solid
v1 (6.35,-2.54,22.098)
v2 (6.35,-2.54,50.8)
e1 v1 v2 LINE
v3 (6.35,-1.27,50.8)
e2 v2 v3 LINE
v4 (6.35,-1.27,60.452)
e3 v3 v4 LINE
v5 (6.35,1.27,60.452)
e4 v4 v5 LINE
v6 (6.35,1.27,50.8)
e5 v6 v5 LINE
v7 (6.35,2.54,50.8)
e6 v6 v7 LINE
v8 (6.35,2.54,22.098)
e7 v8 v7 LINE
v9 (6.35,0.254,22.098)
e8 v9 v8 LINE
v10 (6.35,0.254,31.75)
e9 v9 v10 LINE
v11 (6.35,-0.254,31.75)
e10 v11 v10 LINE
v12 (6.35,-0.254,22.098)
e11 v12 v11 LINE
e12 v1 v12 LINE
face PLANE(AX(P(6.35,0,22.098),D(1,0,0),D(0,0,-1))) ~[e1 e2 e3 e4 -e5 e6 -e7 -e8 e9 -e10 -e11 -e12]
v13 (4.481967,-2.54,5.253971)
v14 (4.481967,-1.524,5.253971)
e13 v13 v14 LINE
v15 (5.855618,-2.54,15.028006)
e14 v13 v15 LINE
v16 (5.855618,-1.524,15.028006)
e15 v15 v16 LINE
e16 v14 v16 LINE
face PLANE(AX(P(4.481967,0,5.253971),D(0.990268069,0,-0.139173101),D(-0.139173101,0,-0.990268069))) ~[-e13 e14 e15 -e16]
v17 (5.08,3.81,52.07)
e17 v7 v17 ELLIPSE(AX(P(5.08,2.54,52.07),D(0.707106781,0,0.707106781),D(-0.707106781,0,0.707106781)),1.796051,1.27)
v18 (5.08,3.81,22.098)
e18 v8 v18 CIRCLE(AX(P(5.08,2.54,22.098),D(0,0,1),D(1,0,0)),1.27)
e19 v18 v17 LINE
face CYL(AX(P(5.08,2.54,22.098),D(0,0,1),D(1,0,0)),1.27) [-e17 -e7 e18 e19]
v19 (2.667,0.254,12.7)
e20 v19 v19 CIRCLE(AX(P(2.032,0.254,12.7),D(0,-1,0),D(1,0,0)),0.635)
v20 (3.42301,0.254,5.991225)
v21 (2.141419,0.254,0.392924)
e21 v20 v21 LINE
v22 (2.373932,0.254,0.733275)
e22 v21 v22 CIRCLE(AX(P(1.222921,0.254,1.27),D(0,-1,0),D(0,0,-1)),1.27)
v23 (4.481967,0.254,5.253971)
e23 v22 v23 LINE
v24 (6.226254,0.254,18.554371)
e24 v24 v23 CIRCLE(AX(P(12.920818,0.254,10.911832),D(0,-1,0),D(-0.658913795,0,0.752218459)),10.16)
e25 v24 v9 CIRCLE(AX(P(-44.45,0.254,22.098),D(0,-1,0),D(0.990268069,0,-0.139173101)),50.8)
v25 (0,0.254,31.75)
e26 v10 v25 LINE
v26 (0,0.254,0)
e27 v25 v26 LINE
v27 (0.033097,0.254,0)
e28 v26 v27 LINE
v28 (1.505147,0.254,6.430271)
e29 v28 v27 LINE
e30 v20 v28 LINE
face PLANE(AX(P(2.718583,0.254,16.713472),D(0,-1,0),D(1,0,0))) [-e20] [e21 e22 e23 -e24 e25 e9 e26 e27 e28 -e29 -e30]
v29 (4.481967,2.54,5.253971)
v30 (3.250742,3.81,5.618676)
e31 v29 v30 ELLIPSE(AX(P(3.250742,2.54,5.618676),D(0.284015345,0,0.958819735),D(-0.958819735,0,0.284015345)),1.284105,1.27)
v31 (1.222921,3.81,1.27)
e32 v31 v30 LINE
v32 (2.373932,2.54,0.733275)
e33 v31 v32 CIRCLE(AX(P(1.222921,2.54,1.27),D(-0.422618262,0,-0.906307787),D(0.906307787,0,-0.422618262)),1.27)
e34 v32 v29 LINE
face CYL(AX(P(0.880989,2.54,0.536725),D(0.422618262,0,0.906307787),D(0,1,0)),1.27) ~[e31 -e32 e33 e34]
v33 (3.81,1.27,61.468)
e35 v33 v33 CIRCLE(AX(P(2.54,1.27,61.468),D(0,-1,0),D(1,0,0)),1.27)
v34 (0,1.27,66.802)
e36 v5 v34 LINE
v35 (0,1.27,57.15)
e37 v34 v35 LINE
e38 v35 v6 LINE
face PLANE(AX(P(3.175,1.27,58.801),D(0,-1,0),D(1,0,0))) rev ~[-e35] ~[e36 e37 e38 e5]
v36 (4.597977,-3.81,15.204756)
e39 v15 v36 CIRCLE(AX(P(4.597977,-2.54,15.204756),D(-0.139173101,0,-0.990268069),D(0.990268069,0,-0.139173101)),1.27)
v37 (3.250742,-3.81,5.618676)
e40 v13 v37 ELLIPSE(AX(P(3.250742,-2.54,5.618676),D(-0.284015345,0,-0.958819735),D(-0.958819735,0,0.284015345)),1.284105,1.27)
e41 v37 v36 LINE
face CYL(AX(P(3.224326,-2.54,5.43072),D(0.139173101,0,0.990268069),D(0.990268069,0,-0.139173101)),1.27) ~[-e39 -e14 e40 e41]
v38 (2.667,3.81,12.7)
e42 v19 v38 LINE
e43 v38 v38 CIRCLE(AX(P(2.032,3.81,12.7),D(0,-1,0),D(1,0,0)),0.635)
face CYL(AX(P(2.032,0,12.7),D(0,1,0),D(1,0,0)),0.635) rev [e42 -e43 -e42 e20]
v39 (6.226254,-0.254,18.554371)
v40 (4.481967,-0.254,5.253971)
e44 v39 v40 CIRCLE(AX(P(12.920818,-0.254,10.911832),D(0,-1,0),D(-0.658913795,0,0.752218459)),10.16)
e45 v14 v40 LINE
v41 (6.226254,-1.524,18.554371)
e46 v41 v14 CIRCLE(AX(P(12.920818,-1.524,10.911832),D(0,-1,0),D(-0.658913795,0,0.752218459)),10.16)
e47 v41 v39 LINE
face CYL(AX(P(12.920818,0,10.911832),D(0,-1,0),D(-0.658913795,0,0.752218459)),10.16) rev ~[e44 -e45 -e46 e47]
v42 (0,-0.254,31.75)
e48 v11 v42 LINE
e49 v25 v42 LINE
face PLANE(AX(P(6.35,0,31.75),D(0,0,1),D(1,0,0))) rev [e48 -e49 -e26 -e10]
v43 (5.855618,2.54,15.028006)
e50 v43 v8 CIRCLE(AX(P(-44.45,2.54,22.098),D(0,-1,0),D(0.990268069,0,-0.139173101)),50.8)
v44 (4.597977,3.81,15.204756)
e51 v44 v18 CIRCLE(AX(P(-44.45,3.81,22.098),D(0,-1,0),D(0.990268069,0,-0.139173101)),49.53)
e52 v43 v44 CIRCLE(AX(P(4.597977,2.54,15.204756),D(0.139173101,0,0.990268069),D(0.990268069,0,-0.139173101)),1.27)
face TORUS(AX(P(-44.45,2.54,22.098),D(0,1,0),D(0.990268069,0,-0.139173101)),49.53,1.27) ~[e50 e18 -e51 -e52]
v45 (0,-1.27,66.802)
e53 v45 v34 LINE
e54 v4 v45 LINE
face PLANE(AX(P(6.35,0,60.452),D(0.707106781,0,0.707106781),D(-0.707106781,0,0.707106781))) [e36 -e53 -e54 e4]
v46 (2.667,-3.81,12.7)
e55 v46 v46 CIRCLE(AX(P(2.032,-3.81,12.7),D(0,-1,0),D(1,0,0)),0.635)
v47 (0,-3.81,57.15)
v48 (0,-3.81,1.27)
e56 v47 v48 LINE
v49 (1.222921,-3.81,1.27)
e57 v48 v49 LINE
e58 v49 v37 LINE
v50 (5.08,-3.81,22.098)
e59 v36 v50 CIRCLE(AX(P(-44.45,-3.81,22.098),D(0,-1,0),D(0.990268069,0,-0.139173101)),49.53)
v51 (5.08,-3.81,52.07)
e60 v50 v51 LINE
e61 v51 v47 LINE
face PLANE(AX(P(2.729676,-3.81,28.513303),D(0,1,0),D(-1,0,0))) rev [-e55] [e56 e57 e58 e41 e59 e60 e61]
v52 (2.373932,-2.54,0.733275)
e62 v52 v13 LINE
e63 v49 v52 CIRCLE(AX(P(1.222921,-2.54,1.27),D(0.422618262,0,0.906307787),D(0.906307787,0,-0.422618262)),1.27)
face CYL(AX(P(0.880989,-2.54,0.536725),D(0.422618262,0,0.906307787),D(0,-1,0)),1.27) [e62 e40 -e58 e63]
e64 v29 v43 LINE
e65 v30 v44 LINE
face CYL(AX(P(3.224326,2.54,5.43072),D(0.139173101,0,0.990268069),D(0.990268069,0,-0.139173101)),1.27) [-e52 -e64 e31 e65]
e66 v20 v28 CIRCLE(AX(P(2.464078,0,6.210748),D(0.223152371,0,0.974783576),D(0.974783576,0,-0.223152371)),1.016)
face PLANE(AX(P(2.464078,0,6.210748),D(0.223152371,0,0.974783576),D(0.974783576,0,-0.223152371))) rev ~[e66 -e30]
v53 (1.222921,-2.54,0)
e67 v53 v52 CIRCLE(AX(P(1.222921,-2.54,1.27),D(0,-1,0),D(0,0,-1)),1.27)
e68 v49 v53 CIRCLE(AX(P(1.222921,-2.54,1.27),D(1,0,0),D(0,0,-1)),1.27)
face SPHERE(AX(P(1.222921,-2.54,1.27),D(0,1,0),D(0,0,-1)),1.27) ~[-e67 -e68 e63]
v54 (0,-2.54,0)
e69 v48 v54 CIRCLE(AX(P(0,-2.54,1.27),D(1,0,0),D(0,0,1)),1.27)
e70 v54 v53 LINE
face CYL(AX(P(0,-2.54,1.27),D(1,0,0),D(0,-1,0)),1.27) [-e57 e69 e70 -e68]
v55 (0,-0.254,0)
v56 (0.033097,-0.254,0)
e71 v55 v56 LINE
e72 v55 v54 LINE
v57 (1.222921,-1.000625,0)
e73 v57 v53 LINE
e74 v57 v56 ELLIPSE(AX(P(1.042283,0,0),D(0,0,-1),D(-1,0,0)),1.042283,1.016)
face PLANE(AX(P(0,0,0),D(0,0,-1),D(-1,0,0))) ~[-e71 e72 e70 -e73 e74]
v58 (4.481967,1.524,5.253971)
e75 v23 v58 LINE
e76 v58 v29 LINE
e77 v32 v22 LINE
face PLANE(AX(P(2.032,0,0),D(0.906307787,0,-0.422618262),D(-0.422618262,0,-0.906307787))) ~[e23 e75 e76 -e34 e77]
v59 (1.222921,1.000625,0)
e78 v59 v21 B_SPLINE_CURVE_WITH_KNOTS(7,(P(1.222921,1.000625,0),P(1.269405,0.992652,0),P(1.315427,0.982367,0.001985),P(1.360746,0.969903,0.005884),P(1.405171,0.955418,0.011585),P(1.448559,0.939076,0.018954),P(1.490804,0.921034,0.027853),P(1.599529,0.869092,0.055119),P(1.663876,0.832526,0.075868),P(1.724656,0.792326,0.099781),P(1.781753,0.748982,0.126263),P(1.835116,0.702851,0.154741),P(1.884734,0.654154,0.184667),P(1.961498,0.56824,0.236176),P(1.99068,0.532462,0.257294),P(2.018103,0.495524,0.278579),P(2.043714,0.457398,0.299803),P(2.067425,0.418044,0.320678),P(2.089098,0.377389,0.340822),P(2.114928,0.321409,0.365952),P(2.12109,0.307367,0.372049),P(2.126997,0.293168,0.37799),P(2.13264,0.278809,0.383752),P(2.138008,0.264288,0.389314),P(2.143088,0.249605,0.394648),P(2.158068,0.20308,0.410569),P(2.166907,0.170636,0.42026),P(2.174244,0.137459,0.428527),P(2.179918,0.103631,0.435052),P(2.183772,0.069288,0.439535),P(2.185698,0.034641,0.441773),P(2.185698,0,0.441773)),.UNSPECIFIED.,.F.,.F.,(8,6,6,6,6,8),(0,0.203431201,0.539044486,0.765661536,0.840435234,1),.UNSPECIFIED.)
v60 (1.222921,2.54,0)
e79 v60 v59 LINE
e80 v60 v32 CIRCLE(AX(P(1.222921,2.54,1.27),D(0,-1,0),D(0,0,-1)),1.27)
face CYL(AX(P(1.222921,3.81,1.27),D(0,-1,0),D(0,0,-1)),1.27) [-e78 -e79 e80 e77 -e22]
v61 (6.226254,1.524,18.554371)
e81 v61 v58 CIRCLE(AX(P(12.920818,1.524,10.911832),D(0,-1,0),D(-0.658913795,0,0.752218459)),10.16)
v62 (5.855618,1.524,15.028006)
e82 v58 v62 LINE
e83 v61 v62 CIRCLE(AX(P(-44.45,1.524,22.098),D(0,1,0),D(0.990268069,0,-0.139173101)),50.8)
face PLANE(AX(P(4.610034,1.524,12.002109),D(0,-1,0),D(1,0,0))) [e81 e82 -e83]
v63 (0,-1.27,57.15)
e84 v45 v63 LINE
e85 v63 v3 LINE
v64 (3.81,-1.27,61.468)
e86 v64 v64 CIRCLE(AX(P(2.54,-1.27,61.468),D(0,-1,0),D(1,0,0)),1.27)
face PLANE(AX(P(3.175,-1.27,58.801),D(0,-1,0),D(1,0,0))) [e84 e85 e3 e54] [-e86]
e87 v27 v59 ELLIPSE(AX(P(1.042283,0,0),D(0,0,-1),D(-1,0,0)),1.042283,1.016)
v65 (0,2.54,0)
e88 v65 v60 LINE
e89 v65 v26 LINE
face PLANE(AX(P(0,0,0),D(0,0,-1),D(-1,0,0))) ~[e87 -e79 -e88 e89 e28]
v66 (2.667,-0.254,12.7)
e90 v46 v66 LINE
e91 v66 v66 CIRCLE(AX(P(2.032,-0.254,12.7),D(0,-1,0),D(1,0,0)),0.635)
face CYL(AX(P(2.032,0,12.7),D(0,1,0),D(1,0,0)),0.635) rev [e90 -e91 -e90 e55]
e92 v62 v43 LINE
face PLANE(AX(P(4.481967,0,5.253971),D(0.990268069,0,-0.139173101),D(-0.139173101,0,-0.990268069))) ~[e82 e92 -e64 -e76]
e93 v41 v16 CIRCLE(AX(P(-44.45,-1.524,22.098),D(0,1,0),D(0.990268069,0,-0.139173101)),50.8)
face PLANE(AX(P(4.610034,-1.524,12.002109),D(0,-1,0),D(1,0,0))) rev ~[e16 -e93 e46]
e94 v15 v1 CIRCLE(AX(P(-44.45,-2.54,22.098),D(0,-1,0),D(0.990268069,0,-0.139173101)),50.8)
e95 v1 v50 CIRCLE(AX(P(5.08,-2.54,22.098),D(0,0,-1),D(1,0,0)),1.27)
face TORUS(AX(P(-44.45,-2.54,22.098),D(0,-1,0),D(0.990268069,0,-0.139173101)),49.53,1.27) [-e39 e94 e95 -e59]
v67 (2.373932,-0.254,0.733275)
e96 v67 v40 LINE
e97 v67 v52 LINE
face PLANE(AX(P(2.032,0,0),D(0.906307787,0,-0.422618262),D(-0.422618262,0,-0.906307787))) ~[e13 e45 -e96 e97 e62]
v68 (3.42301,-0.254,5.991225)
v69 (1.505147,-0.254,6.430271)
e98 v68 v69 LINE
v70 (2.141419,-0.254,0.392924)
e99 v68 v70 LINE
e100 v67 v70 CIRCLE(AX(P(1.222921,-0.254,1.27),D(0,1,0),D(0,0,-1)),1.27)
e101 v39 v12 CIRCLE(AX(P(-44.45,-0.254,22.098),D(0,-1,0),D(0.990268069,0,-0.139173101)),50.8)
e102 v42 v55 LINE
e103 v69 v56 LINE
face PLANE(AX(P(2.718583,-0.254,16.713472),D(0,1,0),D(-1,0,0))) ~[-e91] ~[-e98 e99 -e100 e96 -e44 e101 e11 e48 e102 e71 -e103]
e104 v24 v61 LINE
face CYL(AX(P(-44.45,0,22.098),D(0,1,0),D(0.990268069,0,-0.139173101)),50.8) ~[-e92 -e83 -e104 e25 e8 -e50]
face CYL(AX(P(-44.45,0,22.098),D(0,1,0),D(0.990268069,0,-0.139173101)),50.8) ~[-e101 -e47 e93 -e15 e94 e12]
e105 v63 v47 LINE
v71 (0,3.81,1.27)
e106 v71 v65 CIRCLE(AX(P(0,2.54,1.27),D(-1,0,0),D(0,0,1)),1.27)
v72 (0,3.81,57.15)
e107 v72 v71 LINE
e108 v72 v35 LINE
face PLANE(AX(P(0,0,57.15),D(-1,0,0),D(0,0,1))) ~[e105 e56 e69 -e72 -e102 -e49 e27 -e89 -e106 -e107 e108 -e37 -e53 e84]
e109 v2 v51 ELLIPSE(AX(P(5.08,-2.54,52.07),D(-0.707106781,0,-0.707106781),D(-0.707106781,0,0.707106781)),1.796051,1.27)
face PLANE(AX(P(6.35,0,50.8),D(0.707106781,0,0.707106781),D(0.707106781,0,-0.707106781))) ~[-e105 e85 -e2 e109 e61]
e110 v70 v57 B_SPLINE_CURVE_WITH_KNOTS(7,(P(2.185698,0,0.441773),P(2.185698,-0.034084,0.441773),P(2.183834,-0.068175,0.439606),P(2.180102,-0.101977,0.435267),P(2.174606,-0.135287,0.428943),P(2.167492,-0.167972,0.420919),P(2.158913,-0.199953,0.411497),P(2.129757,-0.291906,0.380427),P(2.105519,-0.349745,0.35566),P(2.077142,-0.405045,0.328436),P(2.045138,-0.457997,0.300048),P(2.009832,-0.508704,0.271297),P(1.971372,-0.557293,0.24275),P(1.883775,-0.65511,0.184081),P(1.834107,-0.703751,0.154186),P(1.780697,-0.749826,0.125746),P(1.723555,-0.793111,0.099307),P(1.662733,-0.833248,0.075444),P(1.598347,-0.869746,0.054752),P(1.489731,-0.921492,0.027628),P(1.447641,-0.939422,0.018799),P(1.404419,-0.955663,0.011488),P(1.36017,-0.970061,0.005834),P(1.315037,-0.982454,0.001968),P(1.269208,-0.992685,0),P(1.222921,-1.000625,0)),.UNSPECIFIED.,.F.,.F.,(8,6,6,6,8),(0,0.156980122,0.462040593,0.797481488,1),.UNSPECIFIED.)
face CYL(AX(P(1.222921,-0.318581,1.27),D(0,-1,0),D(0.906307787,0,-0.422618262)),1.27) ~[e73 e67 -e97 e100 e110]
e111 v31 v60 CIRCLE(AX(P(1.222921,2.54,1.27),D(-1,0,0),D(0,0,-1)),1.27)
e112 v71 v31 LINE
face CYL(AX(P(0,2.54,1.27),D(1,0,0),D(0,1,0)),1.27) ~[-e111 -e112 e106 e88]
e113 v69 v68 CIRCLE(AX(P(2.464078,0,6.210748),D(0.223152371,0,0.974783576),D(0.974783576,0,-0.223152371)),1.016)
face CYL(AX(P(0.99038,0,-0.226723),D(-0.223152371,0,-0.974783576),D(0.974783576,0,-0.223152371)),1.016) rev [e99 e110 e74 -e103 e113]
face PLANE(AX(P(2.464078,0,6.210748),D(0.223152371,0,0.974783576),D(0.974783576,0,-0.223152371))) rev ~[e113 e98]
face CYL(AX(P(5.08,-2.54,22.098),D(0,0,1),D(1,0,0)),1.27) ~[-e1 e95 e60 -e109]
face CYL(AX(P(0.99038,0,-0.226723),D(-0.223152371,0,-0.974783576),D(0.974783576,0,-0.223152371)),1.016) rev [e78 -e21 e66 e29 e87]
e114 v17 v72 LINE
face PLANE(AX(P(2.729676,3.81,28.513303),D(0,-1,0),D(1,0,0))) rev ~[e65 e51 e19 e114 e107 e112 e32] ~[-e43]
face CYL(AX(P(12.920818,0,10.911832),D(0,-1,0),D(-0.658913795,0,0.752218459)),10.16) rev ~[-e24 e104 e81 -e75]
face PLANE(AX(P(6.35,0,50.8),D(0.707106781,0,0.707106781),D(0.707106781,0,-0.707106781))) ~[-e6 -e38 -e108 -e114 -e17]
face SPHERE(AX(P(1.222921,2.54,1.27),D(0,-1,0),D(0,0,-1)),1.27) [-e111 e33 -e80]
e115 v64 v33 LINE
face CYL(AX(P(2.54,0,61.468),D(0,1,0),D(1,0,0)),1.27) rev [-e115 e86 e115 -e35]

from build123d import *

# Parameters (mm, degrees)
F0_R      = 0.635
F1_DEPTH  = 3.81
F2_R      = 0.635
F3_DEPTH  = 0.254
F5_DEPTH  = 1.524
F7_DEPTH  = 1.524
F9_R      = 1.016
F10_DEPTH = 6.604
F0_R_2    = 1.27
F11_DEPTH = 1.27
F12_R     = 1.27


# Not quite as in the source:
# - two fillets or chamfers of one size are made in one step
# - a pattern or mirror of a feature is missing from the dataset's text; its kind, count and spacing are read off the source's solid


with BuildPart() as f1:
    # F0 (on Front) → F1 (new body)
    with BuildSketch(Plane.XZ):
        with BuildLine():
            Line((6.35, 50.8), (0, 57.15))
            Line((0, 57.15), (0, 0))
            Line((0, 0), (2.032, 0))
            Line((2.032, 0), (4.4819667348, 5.2539706179))
            Line((4.4819667348, 5.2539706179), (5.8556178921, 15.0280064712))
            ThreePointArc((5.8556178921, 15.0280064712), (6.2262537532, 18.5543711338), (6.35, 22.098))
            Line((6.35, 22.098), (6.35, 50.8))
        make_face()
        with Locations((2.032, 12.7)):
            Circle(F0_R, mode=Mode.SUBTRACT)
    extrude(amount=-F1_DEPTH)

    # F1_copies: F1 across plane


with BuildPart() as f1_1:
    add(f1.part)
    add(f1.part.mirror(Plane(origin=(0, 0, 0), x_dir=(0, 0, -1), z_dir=(0, -1, 0))))

    # F2 (on face) → F3 (cut)
    with BuildSketch(Plane.XZ):
        with BuildLine():
            Line((6.35, 31.75), (0, 31.75))
            Line((0, 31.75), (0, 0))
            Line((0, 0), (2.032, 0))
            Line((2.032, 0), (4.4819667348, 5.2539706179))
            Line((4.4819667348, 5.2539706179), (5.8556178921, 15.0280064712))
            ThreePointArc((5.8556178921, 15.0280064712), (6.2262537532, 18.5543711338), (6.35, 22.098))
            Line((6.35, 22.098), (6.35, 31.75))
        make_face()
        with Locations((2.032, 12.7)):
            Circle(F2_R, mode=Mode.SUBTRACT)
    f3 = extrude(amount=-F3_DEPTH, mode=Mode.SUBTRACT)

    # F3_copies: F3 across plane
    add(f3.mirror(Plane(origin=(0, 0, 0), x_dir=(0, 0, -1), z_dir=(0, -1, 0))), mode=Mode.SUBTRACT)

    # F4 (on Front) → F5 (cut, symmetric)
    with BuildSketch(Plane.XZ):
        with BuildLine():
            Line((4.4819667348, 5.2539706179), (4.8144904791, 7.62))
            Line((4.8144904791, 7.62), (5.8556178921, 15.0280064712))
            ThreePointArc((5.8556178921, 15.0280064712), (6.0717122847, 16.787954066), (6.2262537532, 18.5543711338))
            ThreePointArc((6.2262537532, 18.5543711338), (2.8470783684, 12.2329567007), (4.4819667348, 5.2539706179))
        make_face()
        with BuildLine():
            Line((5.8556178921, 15.0280064712), (4.8144904791, 7.62))
            Line((4.8144904791, 7.62), (4.4819667348, 5.2539706179))
            Line((4.4819667348, 5.2539706179), (6.2262537532, 5.0006376953))
            Line((6.2262537532, 5.0006376953), (8.3210639079, 18.5543711338))
            Line((8.3210639079, 18.5543711338), (6.2262537532, 18.5543711338))
            ThreePointArc((6.2262537532, 18.5543711338), (6.0717122847, 16.787954066), (5.8556178921, 15.0280064712))
        make_face()
    extrude(amount=F5_DEPTH, both=True, mode=Mode.SUBTRACT)

    # F4 (on Front) → F7 (cut, symmetric)
    with BuildSketch(Plane.XZ):
        with BuildLine():
            Line((4.4819667348, 5.2539706179), (4.8144904791, 7.62))
            Line((4.8144904791, 7.62), (5.8556178921, 15.0280064712))
            ThreePointArc((5.8556178921, 15.0280064712), (6.0717122847, 16.787954066), (6.2262537532, 18.5543711338))
            ThreePointArc((6.2262537532, 18.5543711338), (2.8470783684, 12.2329567007), (4.4819667348, 5.2539706179))
        make_face()
        with BuildLine():
            Line((5.8556178921, 15.0280064712), (4.8144904791, 7.62))
            Line((4.8144904791, 7.62), (4.4819667348, 5.2539706179))
            Line((4.4819667348, 5.2539706179), (6.2262537532, 5.0006376953))
            Line((6.2262537532, 5.0006376953), (8.3210639079, 18.5543711338))
            Line((8.3210639079, 18.5543711338), (6.2262537532, 18.5543711338))
            ThreePointArc((6.2262537532, 18.5543711338), (6.0717122847, 16.787954066), (5.8556178921, 15.0280064712))
        make_face()
    extrude(amount=F7_DEPTH, both=True, mode=Mode.SUBTRACT)

    # F9 (on face) → F10 (cut)
    with BuildSketch(Plane(origin=(0, 0, 0), x_dir=(0.9747835757, 0, -0.2231523707), z_dir=(0.2231523707, 0, 0.9747835757))):
        with Locations((1.016, 0)):
            Circle(F9_R)
    extrude(amount=F10_DEPTH, mode=Mode.SUBTRACT)

    # F0 (on Front) → F11 (join, symmetric)
    with BuildSketch(Plane.XZ):
        Polygon((0, 66.802), (0, 57.15), (6.35, 50.8), (6.35, 60.452), align=None)
        with Locations((2.54, 61.468)):
            Circle(F0_R_2, mode=Mode.SUBTRACT)
    extrude(amount=F11_DEPTH, both=True)

    # F12 (call 1 of 2: OpenCascade refuses the feature's edges together)
    f12_edges = [f1_1.edges().sort_by_distance(p)[0] for p in [
        (1.016, 3.81, 0),
        (6.35, 3.81, 36.449),
        (6.226254, 3.81, 18.554371),
        (3.256983, 3.81, 2.626985),
        (5.168792, 3.81, 10.140989),
        (2.032, 2.06429, 0),
    ]]
    fillet(f12_edges, radius=F12_R)

    # F12#2 (call 2 of 2)
    f12_2_edges = [f1_1.edges().sort_by_distance(p)[0] for p in [
        (6.35, -3.81, 36.449),
        (1.016, -3.81, 0),
        (3.256983, -3.81, 2.626985),
        (5.168792, -3.81, 10.140989),
        (6.226254, -3.81, 18.554371),
        (2.032, -2.06429, 0),
    ]]
    fillet(f12_2_edges, radius=F12_R)


solid = f1_1.part
